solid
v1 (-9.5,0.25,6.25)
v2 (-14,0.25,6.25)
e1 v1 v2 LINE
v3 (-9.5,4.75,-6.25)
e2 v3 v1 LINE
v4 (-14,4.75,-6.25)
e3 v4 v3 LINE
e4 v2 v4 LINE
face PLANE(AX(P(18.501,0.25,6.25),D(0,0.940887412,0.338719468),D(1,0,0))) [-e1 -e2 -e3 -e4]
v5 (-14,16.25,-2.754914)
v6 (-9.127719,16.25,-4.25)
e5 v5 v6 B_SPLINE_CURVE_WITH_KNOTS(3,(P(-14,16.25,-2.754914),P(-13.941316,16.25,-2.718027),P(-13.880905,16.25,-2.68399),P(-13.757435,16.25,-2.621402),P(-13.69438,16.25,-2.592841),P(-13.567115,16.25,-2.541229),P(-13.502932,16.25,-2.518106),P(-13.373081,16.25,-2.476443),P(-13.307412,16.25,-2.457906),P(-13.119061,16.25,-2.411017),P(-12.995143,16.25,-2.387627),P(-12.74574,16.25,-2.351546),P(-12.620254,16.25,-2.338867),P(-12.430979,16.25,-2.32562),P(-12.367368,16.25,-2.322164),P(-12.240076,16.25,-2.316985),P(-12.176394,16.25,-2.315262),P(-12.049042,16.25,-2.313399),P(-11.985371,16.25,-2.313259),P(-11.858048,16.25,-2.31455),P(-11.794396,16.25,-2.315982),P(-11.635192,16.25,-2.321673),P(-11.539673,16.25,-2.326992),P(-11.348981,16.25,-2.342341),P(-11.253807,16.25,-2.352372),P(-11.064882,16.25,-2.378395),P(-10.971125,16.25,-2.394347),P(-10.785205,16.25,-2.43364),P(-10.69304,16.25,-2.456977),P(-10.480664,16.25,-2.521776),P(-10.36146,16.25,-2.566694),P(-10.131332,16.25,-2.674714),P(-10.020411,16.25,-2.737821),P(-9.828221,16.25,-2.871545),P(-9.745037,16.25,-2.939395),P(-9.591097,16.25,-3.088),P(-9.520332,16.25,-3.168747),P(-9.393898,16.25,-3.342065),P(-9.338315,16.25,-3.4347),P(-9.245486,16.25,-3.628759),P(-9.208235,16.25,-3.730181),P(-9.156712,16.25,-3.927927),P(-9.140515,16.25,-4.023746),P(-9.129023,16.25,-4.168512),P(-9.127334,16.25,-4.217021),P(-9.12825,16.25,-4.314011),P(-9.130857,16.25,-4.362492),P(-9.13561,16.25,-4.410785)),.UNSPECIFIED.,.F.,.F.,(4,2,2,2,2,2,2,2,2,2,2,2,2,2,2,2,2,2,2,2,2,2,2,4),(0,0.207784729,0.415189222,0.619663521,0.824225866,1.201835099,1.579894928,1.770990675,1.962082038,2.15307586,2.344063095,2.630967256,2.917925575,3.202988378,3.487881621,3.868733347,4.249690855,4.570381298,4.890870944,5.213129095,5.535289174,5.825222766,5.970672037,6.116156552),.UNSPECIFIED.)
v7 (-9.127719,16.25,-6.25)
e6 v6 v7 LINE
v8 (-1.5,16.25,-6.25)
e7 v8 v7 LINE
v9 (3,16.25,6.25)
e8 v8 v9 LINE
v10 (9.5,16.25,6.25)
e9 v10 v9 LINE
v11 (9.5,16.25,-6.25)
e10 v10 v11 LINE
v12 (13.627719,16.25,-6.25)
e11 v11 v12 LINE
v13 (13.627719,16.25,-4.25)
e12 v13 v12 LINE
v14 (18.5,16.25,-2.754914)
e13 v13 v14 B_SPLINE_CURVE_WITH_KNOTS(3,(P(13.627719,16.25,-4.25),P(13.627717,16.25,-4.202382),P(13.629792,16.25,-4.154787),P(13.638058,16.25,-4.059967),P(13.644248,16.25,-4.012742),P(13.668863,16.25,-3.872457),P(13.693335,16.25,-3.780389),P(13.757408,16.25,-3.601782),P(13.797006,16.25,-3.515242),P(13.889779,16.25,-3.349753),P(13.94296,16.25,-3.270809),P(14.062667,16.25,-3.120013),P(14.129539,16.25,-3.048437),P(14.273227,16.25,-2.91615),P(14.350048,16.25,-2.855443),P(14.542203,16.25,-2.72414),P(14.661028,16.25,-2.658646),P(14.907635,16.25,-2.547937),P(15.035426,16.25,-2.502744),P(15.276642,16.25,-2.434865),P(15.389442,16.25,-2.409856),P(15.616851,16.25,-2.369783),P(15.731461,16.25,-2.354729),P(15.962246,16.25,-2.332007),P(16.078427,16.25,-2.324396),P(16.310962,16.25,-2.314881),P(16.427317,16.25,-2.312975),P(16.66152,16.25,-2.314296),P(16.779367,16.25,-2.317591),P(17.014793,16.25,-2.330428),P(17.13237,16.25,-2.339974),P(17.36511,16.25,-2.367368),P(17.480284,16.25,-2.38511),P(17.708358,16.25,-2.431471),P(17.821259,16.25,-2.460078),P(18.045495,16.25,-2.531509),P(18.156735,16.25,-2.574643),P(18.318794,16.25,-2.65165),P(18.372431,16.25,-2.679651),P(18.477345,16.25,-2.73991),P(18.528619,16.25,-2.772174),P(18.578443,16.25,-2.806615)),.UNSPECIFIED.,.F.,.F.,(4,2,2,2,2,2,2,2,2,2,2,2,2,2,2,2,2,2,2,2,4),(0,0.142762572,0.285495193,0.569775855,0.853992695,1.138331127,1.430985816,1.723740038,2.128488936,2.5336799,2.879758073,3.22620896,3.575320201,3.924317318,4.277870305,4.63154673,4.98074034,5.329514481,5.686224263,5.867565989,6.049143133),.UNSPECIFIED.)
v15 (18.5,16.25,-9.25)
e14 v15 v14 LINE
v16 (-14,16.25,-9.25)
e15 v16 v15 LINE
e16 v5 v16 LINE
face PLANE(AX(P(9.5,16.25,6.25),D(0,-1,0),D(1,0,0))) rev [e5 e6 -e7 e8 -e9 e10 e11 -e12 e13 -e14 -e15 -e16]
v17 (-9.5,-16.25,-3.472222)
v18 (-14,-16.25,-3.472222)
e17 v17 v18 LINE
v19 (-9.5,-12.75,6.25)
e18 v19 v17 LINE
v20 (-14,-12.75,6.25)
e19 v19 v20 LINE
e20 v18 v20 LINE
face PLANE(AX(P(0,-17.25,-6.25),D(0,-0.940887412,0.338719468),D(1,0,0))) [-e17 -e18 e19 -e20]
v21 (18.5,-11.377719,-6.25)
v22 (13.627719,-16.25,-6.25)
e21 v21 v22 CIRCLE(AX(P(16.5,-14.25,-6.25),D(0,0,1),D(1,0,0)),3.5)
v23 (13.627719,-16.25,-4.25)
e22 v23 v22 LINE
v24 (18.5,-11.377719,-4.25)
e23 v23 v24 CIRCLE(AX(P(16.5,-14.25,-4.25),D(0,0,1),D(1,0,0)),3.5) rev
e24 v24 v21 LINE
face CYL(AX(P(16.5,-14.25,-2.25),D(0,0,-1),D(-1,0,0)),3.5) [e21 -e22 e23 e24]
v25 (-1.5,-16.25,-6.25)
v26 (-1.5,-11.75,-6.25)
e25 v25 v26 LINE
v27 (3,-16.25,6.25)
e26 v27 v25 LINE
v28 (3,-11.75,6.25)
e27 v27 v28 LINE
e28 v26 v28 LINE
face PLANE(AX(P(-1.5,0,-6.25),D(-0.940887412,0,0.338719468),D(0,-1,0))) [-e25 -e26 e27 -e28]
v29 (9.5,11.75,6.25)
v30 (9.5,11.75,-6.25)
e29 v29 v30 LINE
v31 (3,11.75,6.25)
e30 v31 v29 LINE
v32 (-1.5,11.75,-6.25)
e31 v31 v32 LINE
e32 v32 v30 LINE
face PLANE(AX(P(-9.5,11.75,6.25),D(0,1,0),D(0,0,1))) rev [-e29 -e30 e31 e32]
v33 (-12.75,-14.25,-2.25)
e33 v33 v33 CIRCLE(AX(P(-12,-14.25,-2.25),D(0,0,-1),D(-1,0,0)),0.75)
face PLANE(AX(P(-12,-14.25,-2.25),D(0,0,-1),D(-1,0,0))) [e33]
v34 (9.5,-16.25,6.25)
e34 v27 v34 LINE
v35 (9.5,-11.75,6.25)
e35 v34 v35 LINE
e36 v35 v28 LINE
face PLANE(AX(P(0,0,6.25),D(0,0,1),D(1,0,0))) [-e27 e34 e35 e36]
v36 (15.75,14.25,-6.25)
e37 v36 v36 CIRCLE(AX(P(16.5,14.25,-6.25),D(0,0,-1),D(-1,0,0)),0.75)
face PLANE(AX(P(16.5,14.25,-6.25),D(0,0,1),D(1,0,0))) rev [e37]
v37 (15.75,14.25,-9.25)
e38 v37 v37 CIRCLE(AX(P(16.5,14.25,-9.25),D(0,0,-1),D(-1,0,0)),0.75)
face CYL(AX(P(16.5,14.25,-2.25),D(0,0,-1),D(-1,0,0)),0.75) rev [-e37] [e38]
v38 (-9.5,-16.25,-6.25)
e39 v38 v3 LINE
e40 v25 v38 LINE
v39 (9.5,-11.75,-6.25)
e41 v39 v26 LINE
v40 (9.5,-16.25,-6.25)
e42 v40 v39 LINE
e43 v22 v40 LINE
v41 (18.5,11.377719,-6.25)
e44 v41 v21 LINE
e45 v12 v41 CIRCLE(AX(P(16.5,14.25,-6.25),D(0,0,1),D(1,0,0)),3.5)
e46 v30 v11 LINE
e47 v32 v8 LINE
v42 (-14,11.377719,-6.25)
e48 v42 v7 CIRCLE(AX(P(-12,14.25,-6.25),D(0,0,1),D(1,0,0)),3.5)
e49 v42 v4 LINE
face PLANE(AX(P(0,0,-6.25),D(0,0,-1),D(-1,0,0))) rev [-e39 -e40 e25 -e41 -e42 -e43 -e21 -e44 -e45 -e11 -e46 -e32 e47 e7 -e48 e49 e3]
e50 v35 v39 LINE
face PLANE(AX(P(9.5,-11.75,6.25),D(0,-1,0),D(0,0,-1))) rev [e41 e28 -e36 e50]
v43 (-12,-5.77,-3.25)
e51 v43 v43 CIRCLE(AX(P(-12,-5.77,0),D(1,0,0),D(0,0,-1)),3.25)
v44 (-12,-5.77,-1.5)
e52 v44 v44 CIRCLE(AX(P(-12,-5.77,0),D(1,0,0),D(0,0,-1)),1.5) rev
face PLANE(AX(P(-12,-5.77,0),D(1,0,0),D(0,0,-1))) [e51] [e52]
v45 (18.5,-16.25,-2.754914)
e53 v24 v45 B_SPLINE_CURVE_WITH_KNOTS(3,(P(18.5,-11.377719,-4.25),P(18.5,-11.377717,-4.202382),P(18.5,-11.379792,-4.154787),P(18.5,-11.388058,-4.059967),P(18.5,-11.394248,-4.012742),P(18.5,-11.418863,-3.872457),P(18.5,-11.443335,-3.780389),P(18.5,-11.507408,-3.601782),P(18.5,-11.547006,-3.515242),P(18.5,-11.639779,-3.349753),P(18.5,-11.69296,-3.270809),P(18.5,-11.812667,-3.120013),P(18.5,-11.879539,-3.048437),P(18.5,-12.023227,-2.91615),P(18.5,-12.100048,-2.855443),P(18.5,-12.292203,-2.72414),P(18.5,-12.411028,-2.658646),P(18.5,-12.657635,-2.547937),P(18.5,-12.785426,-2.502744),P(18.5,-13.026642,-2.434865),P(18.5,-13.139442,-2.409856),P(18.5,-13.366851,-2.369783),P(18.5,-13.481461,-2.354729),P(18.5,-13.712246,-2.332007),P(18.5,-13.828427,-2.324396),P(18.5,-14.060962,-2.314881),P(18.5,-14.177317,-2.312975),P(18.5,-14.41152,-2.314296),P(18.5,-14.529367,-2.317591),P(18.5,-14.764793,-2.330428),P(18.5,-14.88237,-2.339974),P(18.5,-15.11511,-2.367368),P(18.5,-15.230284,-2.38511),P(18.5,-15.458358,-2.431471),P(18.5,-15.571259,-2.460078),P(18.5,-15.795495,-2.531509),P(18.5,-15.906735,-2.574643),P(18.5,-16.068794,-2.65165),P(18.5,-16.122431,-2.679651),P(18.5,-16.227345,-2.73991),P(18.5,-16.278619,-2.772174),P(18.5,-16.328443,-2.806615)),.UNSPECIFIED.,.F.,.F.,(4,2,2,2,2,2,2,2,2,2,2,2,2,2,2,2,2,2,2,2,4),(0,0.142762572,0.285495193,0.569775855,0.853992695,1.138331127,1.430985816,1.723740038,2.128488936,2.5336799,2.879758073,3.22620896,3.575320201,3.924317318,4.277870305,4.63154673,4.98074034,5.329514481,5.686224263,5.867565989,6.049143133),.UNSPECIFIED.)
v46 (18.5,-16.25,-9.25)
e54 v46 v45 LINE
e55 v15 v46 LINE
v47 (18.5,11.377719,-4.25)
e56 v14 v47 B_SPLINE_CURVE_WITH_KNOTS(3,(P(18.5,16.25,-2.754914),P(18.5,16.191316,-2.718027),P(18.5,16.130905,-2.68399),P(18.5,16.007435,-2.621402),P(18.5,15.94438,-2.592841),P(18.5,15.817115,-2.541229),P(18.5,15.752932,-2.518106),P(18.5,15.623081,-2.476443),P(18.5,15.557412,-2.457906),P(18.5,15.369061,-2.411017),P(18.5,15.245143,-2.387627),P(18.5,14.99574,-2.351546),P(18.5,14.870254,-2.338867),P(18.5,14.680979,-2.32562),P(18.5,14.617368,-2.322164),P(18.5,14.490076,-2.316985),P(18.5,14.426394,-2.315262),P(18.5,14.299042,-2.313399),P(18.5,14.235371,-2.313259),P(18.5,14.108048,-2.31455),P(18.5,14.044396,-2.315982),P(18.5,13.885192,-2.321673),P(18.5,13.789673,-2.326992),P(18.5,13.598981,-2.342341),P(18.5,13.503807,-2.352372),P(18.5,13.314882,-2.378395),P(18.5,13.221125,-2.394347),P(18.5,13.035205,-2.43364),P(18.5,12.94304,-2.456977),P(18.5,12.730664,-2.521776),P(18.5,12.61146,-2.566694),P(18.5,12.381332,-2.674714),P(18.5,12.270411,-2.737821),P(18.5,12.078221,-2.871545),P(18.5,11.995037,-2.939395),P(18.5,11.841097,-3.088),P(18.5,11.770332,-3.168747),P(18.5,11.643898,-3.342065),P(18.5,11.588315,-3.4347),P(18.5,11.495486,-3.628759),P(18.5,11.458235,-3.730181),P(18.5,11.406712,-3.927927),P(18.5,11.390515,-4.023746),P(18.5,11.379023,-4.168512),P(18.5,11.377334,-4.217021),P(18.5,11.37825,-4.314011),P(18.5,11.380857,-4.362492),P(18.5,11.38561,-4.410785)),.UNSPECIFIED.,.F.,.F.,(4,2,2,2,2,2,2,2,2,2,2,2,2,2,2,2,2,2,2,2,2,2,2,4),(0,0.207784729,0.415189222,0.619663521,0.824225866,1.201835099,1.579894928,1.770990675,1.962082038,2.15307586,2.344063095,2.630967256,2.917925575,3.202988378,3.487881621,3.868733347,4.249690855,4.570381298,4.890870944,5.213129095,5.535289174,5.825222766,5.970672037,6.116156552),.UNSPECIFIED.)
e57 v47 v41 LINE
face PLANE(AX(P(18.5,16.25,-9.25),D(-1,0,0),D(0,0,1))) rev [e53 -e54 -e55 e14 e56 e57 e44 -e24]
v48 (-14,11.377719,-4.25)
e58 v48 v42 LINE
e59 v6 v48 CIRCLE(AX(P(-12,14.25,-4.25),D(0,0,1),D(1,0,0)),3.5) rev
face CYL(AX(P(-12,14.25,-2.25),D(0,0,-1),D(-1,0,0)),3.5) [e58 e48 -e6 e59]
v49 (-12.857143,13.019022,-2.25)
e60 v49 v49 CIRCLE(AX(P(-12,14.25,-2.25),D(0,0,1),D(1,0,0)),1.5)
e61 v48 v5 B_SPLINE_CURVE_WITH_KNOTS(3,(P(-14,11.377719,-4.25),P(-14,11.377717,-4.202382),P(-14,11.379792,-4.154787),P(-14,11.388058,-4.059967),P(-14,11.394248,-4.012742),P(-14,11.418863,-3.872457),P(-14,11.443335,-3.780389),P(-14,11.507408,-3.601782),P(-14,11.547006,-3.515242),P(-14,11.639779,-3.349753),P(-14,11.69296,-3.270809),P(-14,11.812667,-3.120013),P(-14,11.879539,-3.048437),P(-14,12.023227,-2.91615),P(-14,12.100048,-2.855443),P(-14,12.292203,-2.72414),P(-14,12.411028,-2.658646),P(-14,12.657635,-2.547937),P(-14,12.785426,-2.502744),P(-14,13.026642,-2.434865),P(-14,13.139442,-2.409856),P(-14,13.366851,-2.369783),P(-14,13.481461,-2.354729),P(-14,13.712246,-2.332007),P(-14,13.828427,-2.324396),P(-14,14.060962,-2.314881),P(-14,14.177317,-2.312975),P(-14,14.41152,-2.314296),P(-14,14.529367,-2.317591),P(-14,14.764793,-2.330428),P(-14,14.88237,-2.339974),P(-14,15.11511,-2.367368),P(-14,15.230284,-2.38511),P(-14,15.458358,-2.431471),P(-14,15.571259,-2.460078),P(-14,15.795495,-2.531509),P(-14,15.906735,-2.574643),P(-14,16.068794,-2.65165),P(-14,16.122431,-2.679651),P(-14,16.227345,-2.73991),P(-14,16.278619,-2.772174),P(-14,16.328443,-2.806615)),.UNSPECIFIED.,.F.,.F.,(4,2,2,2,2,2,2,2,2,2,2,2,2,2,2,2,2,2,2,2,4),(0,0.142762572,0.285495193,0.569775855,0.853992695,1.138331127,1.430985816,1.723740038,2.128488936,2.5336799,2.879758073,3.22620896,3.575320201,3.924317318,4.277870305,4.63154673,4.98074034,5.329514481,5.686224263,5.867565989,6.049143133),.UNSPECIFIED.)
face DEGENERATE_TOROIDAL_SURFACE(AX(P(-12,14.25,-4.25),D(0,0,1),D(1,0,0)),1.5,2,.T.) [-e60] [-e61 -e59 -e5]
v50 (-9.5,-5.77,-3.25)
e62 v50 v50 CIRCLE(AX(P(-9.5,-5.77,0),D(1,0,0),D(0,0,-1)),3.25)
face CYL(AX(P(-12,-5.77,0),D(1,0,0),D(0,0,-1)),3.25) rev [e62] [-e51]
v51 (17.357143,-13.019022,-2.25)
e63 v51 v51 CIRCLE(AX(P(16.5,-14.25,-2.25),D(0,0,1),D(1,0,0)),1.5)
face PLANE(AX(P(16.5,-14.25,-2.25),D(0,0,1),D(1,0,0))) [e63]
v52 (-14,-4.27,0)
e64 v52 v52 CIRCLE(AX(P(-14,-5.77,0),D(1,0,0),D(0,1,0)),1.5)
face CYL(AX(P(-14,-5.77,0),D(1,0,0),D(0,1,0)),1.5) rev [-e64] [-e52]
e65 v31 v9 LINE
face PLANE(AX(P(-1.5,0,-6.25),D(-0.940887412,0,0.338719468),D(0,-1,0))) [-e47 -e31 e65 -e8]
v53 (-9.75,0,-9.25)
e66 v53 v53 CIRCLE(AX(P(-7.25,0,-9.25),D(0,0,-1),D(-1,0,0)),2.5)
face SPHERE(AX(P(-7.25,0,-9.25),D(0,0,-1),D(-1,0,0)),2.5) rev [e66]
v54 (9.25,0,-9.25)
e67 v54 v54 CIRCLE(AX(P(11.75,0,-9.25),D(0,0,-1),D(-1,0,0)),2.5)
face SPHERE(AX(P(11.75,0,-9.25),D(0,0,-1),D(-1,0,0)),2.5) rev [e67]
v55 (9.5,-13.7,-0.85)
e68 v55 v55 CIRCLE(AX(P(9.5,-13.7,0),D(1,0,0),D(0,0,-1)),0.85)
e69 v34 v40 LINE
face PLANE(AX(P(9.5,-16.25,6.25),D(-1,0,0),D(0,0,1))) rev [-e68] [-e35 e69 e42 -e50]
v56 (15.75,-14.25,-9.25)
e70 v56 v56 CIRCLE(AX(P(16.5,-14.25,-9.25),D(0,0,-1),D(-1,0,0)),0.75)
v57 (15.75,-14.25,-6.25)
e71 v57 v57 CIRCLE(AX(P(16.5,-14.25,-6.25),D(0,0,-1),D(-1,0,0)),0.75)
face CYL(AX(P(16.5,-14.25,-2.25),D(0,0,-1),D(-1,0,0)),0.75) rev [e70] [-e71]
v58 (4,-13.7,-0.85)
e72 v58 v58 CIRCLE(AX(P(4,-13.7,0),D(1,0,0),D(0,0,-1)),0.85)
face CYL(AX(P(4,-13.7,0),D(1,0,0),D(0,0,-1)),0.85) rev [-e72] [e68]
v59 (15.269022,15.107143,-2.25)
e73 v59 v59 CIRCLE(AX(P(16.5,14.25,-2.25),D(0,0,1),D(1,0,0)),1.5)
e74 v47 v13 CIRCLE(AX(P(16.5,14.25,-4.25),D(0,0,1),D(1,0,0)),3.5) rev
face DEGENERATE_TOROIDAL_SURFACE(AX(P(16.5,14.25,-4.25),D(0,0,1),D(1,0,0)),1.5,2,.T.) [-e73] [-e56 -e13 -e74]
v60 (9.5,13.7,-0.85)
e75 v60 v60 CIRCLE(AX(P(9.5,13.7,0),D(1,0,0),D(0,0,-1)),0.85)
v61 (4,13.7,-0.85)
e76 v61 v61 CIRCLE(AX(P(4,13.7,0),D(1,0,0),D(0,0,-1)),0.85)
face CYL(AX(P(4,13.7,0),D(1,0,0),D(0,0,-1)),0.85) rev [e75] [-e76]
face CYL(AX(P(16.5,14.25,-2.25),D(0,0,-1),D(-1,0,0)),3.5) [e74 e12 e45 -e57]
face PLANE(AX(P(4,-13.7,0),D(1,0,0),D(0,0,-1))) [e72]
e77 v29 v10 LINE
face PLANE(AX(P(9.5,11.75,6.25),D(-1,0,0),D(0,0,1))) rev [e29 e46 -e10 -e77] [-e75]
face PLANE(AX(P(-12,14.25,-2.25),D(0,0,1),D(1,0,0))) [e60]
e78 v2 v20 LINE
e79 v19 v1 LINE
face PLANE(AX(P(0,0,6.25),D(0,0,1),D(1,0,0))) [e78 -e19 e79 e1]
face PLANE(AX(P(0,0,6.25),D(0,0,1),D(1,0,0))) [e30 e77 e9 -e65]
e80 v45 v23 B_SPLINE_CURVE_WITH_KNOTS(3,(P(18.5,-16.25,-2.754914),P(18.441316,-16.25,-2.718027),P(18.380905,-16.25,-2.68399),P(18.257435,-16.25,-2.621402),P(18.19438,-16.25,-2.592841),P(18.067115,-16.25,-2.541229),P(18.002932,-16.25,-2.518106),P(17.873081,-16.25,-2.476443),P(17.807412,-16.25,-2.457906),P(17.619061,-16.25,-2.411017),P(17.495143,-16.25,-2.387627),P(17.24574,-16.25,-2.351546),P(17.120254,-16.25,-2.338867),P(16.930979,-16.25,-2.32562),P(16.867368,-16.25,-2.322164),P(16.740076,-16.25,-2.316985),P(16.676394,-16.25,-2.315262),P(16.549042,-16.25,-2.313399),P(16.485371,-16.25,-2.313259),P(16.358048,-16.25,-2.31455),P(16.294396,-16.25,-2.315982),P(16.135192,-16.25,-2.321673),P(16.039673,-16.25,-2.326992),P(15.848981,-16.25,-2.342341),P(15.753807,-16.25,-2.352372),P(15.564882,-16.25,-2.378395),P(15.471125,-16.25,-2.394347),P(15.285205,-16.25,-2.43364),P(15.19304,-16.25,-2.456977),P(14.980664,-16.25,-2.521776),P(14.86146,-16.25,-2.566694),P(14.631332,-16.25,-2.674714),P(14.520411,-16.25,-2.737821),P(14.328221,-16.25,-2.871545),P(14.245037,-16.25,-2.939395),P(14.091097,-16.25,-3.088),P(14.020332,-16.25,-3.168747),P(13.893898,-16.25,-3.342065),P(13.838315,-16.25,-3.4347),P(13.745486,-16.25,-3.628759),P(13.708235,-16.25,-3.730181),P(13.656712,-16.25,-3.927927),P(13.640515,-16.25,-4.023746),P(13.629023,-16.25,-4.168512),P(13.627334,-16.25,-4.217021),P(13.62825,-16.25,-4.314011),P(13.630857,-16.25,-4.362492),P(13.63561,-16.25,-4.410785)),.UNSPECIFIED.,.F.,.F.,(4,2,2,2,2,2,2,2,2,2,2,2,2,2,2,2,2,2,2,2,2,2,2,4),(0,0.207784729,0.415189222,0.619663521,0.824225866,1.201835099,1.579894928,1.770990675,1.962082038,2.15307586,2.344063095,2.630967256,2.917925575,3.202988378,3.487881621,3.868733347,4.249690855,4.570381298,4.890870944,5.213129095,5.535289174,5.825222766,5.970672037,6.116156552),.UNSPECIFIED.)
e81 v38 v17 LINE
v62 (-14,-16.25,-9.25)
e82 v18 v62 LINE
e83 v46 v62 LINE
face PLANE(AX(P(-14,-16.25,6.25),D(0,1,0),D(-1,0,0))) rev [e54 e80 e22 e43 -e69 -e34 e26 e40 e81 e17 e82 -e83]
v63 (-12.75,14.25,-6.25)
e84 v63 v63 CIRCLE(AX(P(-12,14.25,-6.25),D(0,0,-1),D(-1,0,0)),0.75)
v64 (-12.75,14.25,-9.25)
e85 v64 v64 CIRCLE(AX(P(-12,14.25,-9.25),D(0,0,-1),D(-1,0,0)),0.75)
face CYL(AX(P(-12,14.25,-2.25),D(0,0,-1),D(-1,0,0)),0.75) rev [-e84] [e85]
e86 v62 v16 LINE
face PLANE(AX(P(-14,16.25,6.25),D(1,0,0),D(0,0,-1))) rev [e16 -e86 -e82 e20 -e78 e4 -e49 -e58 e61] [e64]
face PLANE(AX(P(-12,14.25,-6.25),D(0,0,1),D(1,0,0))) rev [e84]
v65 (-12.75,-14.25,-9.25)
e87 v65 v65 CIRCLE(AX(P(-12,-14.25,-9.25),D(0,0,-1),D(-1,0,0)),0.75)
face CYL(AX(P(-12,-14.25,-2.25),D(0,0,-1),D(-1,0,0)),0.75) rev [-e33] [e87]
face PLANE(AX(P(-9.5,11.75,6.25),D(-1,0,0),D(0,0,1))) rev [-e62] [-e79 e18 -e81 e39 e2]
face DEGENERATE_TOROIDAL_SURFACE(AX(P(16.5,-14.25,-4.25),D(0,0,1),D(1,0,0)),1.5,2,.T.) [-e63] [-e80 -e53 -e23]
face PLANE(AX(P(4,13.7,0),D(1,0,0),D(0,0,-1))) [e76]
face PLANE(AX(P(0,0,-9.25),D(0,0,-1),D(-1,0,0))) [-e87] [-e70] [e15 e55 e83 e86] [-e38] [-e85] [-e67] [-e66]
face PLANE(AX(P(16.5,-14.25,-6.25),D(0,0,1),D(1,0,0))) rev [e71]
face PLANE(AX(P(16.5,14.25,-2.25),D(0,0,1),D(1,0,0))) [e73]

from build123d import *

# Parameters (mm, degrees)
EXTRUDE_635_DEPTH      = 6.25
SKETCH_691_R           = 0.85
CUT_EXTRUDE_915_DEPTH  = 5.5
SKETCH_5_W             = 2.5
SKETCH_5_H             = 8
CUT_EXTRUDE_1224_DEPTH = 4.5
SKETCH_1_W             = 32.5
SKETCH_1_H             = 32.5
EXTRUDE_1784_DEPTH     = 3
SKETCH_4_R             = 1.5
CUT_EXTRUDE_2137_DEPTH = 34.669348078
SKETCH_9_R             = 2.5
CUT_EXTRUDE_4617_DEPTH = 2.5
FILLET_3_R             = 2.5
SKETCH_10_W            = 12.5
SKETCH_10_H            = 12.5
CUT_EXTRUDE_5023_DEPTH = 39.52353177
CUT_EXTRUDE_5450_REACH = 39.495
SKETCH_13_W            = 12.5
SKETCH_13_H            = 16
SKETCH_13_H_2          = 3.5
CHAMFER_3_SIZE         = 4.5
CHAMFER_3_SIZE_2       = 12.5
CHAMFER_4_SIZE2        = 12.5
CHAMFER_4_SIZE         = 4.5
SKETCH_15_R            = 0.75
CUT_EXTRUDE_5895_DEPTH = 7
EXTRUDE_6483_DEPTH     = 4
SKETCH_17_R            = 3.25
CUT_EXTRUDE_7051_DEPTH = 2.5


with BuildPart() as part:
    # Эскиз2 → Extrude 635 (new, symmetric)
    with BuildSketch(Plane.XY):
        Polygon((9.5, 16.25), (-14, 16.25), (-14, -16.25), (9.5, -16.25), (9.5, -11.75), (-9.5, -11.75), (-9.5, 11.75), (9.5, 11.75), align=None)
    extrude(amount=EXTRUDE_635_DEPTH, both=True)

    # Sketch 691 → Cut-Extrude 915 (cut)
    with BuildSketch(Plane(origin=(9.5, 0, 0), x_dir=(0, 0, -1), z_dir=(1, 0, 0))):
        with Locations((0, 13.7)):
            Circle(SKETCH_691_R)
        with Locations((0, -13.7)):
            Circle(SKETCH_691_R)
    extrude(amount=-CUT_EXTRUDE_915_DEPTH, mode=Mode.SUBTRACT)

    # Эскиз5 → Cut-Extrude 1224 (cut)
    with BuildSketch(Plane.XZ.offset(11.75)):
        with Locations((-4.2, 2.25)):
            Rectangle(SKETCH_5_W, SKETCH_5_H)
    extrude(amount=CUT_EXTRUDE_1224_DEPTH, mode=Mode.SUBTRACT)

    # Эскиз1 → Extrude 1784 (add)
    with BuildSketch(Plane(origin=(0, 0, -6.25), x_dir=(-1, 0, 0), z_dir=(0, 0, -1))):
        with Locations((-2.25, 0)):
            Rectangle(SKETCH_1_W, SKETCH_1_H)
    extrude(amount=EXTRUDE_1784_DEPTH)

    # Эскиз4 → Cut-Extrude 2137 (cut, through all)
    with BuildSketch(Plane(origin=(-9.5, 0, 0), x_dir=(0, 0, -1), z_dir=(1, 0, 0))):
        with Locations(Location((0, -5.77, 0), (0, 0, 90))):
            Circle(SKETCH_4_R)
    extrude(amount=-CUT_EXTRUDE_2137_DEPTH, mode=Mode.SUBTRACT)

    # Эскиз9 → Cut-Extrude 4617 (cut)
    with BuildSketch(Plane(origin=(0, 0, -9.25), x_dir=(-1, 0, 0), z_dir=(0, 0, -1))):
        with Locations((-11.75, 0)):
            Circle(SKETCH_9_R)
        with Locations((7.25, 0)):
            Circle(SKETCH_9_R)
    extrude(amount=-CUT_EXTRUDE_4617_DEPTH, mode=Mode.SUBTRACT)

    # Скругление3
    fillet_3_edges = [part.edges().sort_by_distance(p)[0] for p in [
        (14.25, 0, -6.75),
        (-4.75, 0, -6.75),
    ]]
    fillet(fillet_3_edges, radius=FILLET_3_R - 0.0001)  # a hair under: the kernel refuses the full size

    # Эскиз10 → Cut-Extrude 5023 (cut, through all)
    with BuildSketch(Plane(origin=(0, 16.25, 0), x_dir=(1, 0, 0), z_dir=(0, 1, 0))):
        with Locations((-3.25, 0)):
            Rectangle(SKETCH_10_W, SKETCH_10_H)
    extrude(amount=-CUT_EXTRUDE_5023_DEPTH, mode=Mode.SUBTRACT)

    # Эскиз13 → Cut-Extrude 5450 (cut, up to next)
    with BuildSketch(Plane.ZY.offset(14), mode=Mode.PRIVATE) as cut_extrude_5450_sk1:
        with Locations((0, 8.25)):
            Rectangle(SKETCH_13_W, SKETCH_13_H)
    cut_extrude_5450_tool1 = extrude(cut_extrude_5450_sk1.sketch, amount=-CUT_EXTRUDE_5450_REACH, mode=Mode.PRIVATE) & part.part
    # Эскиз13 → Cut-Extrude 5450 (cut, up to next)
    with BuildSketch(Plane.ZY.offset(14), mode=Mode.PRIVATE) as cut_extrude_5450_sk2:
        with Locations((0, -14.5)):
            Rectangle(SKETCH_13_W, SKETCH_13_H_2)
    cut_extrude_5450_tool2 = extrude(cut_extrude_5450_sk2.sketch, amount=-CUT_EXTRUDE_5450_REACH, mode=Mode.PRIVATE) & part.part
    add(cut_extrude_5450_tool1.solids().sort_by_distance((-14, 8.25, 0))[0], mode=Mode.SUBTRACT)
    add(cut_extrude_5450_tool2.solids().sort_by_distance((-14, -14.5, 0))[0], mode=Mode.SUBTRACT)

    # Фаска3
    # the kernel refuses this chamfer: 12.5, 4.5 mm, written as the material it adds along each edge
    with BuildSketch(Plane(origin=(3, 16.25, -6.25), x_dir=(-1, 0, 0), z_dir=(0, -1, 0))) as chamfer_3_piece_1:
        Polygon((CHAMFER_3_SIZE, 0), (0, -CHAMFER_3_SIZE_2), (0, 0), align=None)
    extrude(amount=4.5)
    with BuildSketch(Plane(origin=(3, 48.678873385, -6.25), x_dir=(-1, 0, 0), z_dir=(0, -1, 0))) as chamfer_3_piece_2_section:
        Polygon((CHAMFER_3_SIZE, 0), (0, -CHAMFER_3_SIZE_2), (0, 0), align=None)
    chamfer_3_piece_2 = extrude(amount=69.357746771, mode=Mode.PRIVATE)
    chamfer_3_piece_2 = split(chamfer_3_piece_2, bisect_by=Plane(origin=(3, -16.25, -6.25), z_dir=(0, 1, 0)), keep=Keep.TOP, mode=Mode.PRIVATE)
    chamfer_3_piece_2 = split(chamfer_3_piece_2, bisect_by=Plane(origin=(3, -11.75, -6.25), z_dir=(0, -1, 0)), keep=Keep.TOP, mode=Mode.PRIVATE)
    add(chamfer_3_piece_2)
    with BuildSketch(Plane(origin=(3, 20.678873385, -6.25), x_dir=(0, 0, 1), z_dir=(0, -1, 0))) as chamfer_3_piece_3_section:
        Polygon((CHAMFER_3_SIZE_2, 0), (0, CHAMFER_3_SIZE), (0, 0), align=None)
    chamfer_3_piece_3 = extrude(amount=69.357746771, mode=Mode.PRIVATE)
    chamfer_3_piece_3 = split(chamfer_3_piece_3, bisect_by=Plane(origin=(3, 11.75, -6.25), z_dir=(0, 1, 0)), keep=Keep.TOP, mode=Mode.PRIVATE)
    chamfer_3_piece_3 = split(chamfer_3_piece_3, bisect_by=Plane(origin=(3, 16.25, -6.25), z_dir=(0, -1, 0)), keep=Keep.TOP, mode=Mode.PRIVATE)
    add(chamfer_3_piece_3)
    with BuildSketch(Plane(origin=(3, -11.75, -6.25), x_dir=(0, 0, 1), z_dir=(0, -1, 0))) as chamfer_3_piece_4:
        Polygon((CHAMFER_3_SIZE_2, 0), (0, CHAMFER_3_SIZE), (0, 0), align=None)
    extrude(amount=4.5)
    with BuildSketch(Plane(origin=(-14, -12.75, -6.25), x_dir=(0, -1, 0), z_dir=(1, 0, 0))) as chamfer_3_piece_5_section:
        Polygon((CHAMFER_3_SIZE, 0), (0, -CHAMFER_3_SIZE_2), (0, 0), align=None)
    chamfer_3_piece_5 = extrude(amount=4.5, mode=Mode.PRIVATE)
    chamfer_3_piece_5 = split(chamfer_3_piece_5, bisect_by=Plane(origin=(-14, -16.25, -6.25), z_dir=(0, 1, 0)), keep=Keep.TOP, mode=Mode.PRIVATE)
    add(chamfer_3_piece_5)

    # Фаска4
    chamfer_4_edges = [part.edges().sort_by_distance(p)[0] for p in [
        (-11.75, 0.25, -6.25),
    ]]
    chamfer_4_side = [part.faces().sort_by_distance(p)[0] for p in [
        (-11.75, 0.34, -6.25),
    ]]
    chamfer(chamfer_4_edges, length=CHAMFER_4_SIZE - 0.0001, length2=CHAMFER_4_SIZE2 - 0.0001, reference=chamfer_4_side[0])  # a hair under: the kernel refuses the full size

    # Эскиз15 → Cut-Extrude 5895 (cut)
    with BuildSketch(Plane(origin=(0, 0, -9.25), x_dir=(-1, 0, 0), z_dir=(0, 0, -1))):
        with Locations((12, -14.25)):
            Circle(SKETCH_15_R)
        with Locations((12, 14.25)):
            Circle(SKETCH_15_R)
        with Locations((-16.5, 14.25)):
            Circle(SKETCH_15_R)
        with Locations((-16.5, -14.25)):
            Circle(SKETCH_15_R)
    extrude(amount=-CUT_EXTRUDE_5895_DEPTH, mode=Mode.SUBTRACT)

    # Эскиз16 → Extrude 6483 (add)
    with BuildSketch(Plane.XY.offset(-6.25)):
        with BuildLine():
            Line((-14, 11.377718677), (-14, 16.25))
            Line((-14, 16.25), (-9.127718677, 16.25))
            ThreePointArc((-9.127718677, 16.25), (-9.525126266, 11.775126266), (-14, 11.377718677))
        make_face()
        with BuildLine():
            Line((13.627718677, 16.25), (18.5, 16.25))
            Line((18.5, 16.25), (18.5, 11.377718677))
            ThreePointArc((18.5, 11.377718677), (14.025126266, 11.775126266), (13.627718677, 16.25))
        make_face()
        with BuildLine():
            Line((18.5, -11.377718677), (18.5, -16.25))
            Line((18.5, -16.25), (13.627718677, -16.25))
            ThreePointArc((13.627718677, -16.25), (14.025126266, -11.775126266), (18.5, -11.377718677))
        make_face()
    extrude(amount=EXTRUDE_6483_DEPTH)

    # Скругление4: read off the stored shape, not the designer's step
    # Скругление4 outline → Скругление4 (revolve, cut)
    with BuildSketch(Plane(origin=(16.5, 14.25, 0), x_dir=(1, 0, 0), z_dir=(0, -1, 0))):
        with BuildLine():
            ThreePointArc((1.5, -2.25), (2.914213562, -2.835786438), (3.5, -4.25))
            Line((3.5, -4.25), (3.5, -2.25))
            Line((3.5, -2.25), (1.5, -2.25))
        make_face()
    revolve(axis=Axis((16.5, 14.25, 0), (0, 0, 1)), mode=Mode.SUBTRACT)

    # Fillet 4 2 outline → Fillet 4 2 (revolve, cut)
    with BuildSketch(Plane(origin=(-12, 14.25, 0), x_dir=(1, 0, 0), z_dir=(0, -1, 0))):
        with BuildLine():
            ThreePointArc((1.5, -2.25), (2.914213562, -2.835786438), (3.5, -4.25))
            Line((3.5, -4.25), (3.5, -2.25))
            Line((3.5, -2.25), (1.5, -2.25))
        make_face()
    revolve(axis=Axis((-12, 14.25, 0), (0, 0, 1)), mode=Mode.SUBTRACT)

    # Fillet 4 3 outline → Fillet 4 3 (revolve, cut)
    with BuildSketch(Plane(origin=(16.5, -14.25, 0), x_dir=(1, 0, 0), z_dir=(0, -1, 0))):
        with BuildLine():
            ThreePointArc((1.5, -2.25), (2.914213562, -2.835786438), (3.5, -4.25))
            Line((3.5, -4.25), (3.5, -2.25))
            Line((3.5, -2.25), (1.5, -2.25))
        make_face()
    revolve(axis=Axis((16.5, -14.25, 0), (0, 0, 1)), mode=Mode.SUBTRACT)

    # Эскиз17 → Cut-Extrude 7051 (cut)
    with BuildSketch(Plane(origin=(-9.5, 0, 0), x_dir=(0, 0, -1), z_dir=(1, 0, 0))):
        with Locations((0, -5.77)):
            Circle(SKETCH_17_R)
    extrude(amount=-CUT_EXTRUDE_7051_DEPTH, mode=Mode.SUBTRACT)


solid = part.part
